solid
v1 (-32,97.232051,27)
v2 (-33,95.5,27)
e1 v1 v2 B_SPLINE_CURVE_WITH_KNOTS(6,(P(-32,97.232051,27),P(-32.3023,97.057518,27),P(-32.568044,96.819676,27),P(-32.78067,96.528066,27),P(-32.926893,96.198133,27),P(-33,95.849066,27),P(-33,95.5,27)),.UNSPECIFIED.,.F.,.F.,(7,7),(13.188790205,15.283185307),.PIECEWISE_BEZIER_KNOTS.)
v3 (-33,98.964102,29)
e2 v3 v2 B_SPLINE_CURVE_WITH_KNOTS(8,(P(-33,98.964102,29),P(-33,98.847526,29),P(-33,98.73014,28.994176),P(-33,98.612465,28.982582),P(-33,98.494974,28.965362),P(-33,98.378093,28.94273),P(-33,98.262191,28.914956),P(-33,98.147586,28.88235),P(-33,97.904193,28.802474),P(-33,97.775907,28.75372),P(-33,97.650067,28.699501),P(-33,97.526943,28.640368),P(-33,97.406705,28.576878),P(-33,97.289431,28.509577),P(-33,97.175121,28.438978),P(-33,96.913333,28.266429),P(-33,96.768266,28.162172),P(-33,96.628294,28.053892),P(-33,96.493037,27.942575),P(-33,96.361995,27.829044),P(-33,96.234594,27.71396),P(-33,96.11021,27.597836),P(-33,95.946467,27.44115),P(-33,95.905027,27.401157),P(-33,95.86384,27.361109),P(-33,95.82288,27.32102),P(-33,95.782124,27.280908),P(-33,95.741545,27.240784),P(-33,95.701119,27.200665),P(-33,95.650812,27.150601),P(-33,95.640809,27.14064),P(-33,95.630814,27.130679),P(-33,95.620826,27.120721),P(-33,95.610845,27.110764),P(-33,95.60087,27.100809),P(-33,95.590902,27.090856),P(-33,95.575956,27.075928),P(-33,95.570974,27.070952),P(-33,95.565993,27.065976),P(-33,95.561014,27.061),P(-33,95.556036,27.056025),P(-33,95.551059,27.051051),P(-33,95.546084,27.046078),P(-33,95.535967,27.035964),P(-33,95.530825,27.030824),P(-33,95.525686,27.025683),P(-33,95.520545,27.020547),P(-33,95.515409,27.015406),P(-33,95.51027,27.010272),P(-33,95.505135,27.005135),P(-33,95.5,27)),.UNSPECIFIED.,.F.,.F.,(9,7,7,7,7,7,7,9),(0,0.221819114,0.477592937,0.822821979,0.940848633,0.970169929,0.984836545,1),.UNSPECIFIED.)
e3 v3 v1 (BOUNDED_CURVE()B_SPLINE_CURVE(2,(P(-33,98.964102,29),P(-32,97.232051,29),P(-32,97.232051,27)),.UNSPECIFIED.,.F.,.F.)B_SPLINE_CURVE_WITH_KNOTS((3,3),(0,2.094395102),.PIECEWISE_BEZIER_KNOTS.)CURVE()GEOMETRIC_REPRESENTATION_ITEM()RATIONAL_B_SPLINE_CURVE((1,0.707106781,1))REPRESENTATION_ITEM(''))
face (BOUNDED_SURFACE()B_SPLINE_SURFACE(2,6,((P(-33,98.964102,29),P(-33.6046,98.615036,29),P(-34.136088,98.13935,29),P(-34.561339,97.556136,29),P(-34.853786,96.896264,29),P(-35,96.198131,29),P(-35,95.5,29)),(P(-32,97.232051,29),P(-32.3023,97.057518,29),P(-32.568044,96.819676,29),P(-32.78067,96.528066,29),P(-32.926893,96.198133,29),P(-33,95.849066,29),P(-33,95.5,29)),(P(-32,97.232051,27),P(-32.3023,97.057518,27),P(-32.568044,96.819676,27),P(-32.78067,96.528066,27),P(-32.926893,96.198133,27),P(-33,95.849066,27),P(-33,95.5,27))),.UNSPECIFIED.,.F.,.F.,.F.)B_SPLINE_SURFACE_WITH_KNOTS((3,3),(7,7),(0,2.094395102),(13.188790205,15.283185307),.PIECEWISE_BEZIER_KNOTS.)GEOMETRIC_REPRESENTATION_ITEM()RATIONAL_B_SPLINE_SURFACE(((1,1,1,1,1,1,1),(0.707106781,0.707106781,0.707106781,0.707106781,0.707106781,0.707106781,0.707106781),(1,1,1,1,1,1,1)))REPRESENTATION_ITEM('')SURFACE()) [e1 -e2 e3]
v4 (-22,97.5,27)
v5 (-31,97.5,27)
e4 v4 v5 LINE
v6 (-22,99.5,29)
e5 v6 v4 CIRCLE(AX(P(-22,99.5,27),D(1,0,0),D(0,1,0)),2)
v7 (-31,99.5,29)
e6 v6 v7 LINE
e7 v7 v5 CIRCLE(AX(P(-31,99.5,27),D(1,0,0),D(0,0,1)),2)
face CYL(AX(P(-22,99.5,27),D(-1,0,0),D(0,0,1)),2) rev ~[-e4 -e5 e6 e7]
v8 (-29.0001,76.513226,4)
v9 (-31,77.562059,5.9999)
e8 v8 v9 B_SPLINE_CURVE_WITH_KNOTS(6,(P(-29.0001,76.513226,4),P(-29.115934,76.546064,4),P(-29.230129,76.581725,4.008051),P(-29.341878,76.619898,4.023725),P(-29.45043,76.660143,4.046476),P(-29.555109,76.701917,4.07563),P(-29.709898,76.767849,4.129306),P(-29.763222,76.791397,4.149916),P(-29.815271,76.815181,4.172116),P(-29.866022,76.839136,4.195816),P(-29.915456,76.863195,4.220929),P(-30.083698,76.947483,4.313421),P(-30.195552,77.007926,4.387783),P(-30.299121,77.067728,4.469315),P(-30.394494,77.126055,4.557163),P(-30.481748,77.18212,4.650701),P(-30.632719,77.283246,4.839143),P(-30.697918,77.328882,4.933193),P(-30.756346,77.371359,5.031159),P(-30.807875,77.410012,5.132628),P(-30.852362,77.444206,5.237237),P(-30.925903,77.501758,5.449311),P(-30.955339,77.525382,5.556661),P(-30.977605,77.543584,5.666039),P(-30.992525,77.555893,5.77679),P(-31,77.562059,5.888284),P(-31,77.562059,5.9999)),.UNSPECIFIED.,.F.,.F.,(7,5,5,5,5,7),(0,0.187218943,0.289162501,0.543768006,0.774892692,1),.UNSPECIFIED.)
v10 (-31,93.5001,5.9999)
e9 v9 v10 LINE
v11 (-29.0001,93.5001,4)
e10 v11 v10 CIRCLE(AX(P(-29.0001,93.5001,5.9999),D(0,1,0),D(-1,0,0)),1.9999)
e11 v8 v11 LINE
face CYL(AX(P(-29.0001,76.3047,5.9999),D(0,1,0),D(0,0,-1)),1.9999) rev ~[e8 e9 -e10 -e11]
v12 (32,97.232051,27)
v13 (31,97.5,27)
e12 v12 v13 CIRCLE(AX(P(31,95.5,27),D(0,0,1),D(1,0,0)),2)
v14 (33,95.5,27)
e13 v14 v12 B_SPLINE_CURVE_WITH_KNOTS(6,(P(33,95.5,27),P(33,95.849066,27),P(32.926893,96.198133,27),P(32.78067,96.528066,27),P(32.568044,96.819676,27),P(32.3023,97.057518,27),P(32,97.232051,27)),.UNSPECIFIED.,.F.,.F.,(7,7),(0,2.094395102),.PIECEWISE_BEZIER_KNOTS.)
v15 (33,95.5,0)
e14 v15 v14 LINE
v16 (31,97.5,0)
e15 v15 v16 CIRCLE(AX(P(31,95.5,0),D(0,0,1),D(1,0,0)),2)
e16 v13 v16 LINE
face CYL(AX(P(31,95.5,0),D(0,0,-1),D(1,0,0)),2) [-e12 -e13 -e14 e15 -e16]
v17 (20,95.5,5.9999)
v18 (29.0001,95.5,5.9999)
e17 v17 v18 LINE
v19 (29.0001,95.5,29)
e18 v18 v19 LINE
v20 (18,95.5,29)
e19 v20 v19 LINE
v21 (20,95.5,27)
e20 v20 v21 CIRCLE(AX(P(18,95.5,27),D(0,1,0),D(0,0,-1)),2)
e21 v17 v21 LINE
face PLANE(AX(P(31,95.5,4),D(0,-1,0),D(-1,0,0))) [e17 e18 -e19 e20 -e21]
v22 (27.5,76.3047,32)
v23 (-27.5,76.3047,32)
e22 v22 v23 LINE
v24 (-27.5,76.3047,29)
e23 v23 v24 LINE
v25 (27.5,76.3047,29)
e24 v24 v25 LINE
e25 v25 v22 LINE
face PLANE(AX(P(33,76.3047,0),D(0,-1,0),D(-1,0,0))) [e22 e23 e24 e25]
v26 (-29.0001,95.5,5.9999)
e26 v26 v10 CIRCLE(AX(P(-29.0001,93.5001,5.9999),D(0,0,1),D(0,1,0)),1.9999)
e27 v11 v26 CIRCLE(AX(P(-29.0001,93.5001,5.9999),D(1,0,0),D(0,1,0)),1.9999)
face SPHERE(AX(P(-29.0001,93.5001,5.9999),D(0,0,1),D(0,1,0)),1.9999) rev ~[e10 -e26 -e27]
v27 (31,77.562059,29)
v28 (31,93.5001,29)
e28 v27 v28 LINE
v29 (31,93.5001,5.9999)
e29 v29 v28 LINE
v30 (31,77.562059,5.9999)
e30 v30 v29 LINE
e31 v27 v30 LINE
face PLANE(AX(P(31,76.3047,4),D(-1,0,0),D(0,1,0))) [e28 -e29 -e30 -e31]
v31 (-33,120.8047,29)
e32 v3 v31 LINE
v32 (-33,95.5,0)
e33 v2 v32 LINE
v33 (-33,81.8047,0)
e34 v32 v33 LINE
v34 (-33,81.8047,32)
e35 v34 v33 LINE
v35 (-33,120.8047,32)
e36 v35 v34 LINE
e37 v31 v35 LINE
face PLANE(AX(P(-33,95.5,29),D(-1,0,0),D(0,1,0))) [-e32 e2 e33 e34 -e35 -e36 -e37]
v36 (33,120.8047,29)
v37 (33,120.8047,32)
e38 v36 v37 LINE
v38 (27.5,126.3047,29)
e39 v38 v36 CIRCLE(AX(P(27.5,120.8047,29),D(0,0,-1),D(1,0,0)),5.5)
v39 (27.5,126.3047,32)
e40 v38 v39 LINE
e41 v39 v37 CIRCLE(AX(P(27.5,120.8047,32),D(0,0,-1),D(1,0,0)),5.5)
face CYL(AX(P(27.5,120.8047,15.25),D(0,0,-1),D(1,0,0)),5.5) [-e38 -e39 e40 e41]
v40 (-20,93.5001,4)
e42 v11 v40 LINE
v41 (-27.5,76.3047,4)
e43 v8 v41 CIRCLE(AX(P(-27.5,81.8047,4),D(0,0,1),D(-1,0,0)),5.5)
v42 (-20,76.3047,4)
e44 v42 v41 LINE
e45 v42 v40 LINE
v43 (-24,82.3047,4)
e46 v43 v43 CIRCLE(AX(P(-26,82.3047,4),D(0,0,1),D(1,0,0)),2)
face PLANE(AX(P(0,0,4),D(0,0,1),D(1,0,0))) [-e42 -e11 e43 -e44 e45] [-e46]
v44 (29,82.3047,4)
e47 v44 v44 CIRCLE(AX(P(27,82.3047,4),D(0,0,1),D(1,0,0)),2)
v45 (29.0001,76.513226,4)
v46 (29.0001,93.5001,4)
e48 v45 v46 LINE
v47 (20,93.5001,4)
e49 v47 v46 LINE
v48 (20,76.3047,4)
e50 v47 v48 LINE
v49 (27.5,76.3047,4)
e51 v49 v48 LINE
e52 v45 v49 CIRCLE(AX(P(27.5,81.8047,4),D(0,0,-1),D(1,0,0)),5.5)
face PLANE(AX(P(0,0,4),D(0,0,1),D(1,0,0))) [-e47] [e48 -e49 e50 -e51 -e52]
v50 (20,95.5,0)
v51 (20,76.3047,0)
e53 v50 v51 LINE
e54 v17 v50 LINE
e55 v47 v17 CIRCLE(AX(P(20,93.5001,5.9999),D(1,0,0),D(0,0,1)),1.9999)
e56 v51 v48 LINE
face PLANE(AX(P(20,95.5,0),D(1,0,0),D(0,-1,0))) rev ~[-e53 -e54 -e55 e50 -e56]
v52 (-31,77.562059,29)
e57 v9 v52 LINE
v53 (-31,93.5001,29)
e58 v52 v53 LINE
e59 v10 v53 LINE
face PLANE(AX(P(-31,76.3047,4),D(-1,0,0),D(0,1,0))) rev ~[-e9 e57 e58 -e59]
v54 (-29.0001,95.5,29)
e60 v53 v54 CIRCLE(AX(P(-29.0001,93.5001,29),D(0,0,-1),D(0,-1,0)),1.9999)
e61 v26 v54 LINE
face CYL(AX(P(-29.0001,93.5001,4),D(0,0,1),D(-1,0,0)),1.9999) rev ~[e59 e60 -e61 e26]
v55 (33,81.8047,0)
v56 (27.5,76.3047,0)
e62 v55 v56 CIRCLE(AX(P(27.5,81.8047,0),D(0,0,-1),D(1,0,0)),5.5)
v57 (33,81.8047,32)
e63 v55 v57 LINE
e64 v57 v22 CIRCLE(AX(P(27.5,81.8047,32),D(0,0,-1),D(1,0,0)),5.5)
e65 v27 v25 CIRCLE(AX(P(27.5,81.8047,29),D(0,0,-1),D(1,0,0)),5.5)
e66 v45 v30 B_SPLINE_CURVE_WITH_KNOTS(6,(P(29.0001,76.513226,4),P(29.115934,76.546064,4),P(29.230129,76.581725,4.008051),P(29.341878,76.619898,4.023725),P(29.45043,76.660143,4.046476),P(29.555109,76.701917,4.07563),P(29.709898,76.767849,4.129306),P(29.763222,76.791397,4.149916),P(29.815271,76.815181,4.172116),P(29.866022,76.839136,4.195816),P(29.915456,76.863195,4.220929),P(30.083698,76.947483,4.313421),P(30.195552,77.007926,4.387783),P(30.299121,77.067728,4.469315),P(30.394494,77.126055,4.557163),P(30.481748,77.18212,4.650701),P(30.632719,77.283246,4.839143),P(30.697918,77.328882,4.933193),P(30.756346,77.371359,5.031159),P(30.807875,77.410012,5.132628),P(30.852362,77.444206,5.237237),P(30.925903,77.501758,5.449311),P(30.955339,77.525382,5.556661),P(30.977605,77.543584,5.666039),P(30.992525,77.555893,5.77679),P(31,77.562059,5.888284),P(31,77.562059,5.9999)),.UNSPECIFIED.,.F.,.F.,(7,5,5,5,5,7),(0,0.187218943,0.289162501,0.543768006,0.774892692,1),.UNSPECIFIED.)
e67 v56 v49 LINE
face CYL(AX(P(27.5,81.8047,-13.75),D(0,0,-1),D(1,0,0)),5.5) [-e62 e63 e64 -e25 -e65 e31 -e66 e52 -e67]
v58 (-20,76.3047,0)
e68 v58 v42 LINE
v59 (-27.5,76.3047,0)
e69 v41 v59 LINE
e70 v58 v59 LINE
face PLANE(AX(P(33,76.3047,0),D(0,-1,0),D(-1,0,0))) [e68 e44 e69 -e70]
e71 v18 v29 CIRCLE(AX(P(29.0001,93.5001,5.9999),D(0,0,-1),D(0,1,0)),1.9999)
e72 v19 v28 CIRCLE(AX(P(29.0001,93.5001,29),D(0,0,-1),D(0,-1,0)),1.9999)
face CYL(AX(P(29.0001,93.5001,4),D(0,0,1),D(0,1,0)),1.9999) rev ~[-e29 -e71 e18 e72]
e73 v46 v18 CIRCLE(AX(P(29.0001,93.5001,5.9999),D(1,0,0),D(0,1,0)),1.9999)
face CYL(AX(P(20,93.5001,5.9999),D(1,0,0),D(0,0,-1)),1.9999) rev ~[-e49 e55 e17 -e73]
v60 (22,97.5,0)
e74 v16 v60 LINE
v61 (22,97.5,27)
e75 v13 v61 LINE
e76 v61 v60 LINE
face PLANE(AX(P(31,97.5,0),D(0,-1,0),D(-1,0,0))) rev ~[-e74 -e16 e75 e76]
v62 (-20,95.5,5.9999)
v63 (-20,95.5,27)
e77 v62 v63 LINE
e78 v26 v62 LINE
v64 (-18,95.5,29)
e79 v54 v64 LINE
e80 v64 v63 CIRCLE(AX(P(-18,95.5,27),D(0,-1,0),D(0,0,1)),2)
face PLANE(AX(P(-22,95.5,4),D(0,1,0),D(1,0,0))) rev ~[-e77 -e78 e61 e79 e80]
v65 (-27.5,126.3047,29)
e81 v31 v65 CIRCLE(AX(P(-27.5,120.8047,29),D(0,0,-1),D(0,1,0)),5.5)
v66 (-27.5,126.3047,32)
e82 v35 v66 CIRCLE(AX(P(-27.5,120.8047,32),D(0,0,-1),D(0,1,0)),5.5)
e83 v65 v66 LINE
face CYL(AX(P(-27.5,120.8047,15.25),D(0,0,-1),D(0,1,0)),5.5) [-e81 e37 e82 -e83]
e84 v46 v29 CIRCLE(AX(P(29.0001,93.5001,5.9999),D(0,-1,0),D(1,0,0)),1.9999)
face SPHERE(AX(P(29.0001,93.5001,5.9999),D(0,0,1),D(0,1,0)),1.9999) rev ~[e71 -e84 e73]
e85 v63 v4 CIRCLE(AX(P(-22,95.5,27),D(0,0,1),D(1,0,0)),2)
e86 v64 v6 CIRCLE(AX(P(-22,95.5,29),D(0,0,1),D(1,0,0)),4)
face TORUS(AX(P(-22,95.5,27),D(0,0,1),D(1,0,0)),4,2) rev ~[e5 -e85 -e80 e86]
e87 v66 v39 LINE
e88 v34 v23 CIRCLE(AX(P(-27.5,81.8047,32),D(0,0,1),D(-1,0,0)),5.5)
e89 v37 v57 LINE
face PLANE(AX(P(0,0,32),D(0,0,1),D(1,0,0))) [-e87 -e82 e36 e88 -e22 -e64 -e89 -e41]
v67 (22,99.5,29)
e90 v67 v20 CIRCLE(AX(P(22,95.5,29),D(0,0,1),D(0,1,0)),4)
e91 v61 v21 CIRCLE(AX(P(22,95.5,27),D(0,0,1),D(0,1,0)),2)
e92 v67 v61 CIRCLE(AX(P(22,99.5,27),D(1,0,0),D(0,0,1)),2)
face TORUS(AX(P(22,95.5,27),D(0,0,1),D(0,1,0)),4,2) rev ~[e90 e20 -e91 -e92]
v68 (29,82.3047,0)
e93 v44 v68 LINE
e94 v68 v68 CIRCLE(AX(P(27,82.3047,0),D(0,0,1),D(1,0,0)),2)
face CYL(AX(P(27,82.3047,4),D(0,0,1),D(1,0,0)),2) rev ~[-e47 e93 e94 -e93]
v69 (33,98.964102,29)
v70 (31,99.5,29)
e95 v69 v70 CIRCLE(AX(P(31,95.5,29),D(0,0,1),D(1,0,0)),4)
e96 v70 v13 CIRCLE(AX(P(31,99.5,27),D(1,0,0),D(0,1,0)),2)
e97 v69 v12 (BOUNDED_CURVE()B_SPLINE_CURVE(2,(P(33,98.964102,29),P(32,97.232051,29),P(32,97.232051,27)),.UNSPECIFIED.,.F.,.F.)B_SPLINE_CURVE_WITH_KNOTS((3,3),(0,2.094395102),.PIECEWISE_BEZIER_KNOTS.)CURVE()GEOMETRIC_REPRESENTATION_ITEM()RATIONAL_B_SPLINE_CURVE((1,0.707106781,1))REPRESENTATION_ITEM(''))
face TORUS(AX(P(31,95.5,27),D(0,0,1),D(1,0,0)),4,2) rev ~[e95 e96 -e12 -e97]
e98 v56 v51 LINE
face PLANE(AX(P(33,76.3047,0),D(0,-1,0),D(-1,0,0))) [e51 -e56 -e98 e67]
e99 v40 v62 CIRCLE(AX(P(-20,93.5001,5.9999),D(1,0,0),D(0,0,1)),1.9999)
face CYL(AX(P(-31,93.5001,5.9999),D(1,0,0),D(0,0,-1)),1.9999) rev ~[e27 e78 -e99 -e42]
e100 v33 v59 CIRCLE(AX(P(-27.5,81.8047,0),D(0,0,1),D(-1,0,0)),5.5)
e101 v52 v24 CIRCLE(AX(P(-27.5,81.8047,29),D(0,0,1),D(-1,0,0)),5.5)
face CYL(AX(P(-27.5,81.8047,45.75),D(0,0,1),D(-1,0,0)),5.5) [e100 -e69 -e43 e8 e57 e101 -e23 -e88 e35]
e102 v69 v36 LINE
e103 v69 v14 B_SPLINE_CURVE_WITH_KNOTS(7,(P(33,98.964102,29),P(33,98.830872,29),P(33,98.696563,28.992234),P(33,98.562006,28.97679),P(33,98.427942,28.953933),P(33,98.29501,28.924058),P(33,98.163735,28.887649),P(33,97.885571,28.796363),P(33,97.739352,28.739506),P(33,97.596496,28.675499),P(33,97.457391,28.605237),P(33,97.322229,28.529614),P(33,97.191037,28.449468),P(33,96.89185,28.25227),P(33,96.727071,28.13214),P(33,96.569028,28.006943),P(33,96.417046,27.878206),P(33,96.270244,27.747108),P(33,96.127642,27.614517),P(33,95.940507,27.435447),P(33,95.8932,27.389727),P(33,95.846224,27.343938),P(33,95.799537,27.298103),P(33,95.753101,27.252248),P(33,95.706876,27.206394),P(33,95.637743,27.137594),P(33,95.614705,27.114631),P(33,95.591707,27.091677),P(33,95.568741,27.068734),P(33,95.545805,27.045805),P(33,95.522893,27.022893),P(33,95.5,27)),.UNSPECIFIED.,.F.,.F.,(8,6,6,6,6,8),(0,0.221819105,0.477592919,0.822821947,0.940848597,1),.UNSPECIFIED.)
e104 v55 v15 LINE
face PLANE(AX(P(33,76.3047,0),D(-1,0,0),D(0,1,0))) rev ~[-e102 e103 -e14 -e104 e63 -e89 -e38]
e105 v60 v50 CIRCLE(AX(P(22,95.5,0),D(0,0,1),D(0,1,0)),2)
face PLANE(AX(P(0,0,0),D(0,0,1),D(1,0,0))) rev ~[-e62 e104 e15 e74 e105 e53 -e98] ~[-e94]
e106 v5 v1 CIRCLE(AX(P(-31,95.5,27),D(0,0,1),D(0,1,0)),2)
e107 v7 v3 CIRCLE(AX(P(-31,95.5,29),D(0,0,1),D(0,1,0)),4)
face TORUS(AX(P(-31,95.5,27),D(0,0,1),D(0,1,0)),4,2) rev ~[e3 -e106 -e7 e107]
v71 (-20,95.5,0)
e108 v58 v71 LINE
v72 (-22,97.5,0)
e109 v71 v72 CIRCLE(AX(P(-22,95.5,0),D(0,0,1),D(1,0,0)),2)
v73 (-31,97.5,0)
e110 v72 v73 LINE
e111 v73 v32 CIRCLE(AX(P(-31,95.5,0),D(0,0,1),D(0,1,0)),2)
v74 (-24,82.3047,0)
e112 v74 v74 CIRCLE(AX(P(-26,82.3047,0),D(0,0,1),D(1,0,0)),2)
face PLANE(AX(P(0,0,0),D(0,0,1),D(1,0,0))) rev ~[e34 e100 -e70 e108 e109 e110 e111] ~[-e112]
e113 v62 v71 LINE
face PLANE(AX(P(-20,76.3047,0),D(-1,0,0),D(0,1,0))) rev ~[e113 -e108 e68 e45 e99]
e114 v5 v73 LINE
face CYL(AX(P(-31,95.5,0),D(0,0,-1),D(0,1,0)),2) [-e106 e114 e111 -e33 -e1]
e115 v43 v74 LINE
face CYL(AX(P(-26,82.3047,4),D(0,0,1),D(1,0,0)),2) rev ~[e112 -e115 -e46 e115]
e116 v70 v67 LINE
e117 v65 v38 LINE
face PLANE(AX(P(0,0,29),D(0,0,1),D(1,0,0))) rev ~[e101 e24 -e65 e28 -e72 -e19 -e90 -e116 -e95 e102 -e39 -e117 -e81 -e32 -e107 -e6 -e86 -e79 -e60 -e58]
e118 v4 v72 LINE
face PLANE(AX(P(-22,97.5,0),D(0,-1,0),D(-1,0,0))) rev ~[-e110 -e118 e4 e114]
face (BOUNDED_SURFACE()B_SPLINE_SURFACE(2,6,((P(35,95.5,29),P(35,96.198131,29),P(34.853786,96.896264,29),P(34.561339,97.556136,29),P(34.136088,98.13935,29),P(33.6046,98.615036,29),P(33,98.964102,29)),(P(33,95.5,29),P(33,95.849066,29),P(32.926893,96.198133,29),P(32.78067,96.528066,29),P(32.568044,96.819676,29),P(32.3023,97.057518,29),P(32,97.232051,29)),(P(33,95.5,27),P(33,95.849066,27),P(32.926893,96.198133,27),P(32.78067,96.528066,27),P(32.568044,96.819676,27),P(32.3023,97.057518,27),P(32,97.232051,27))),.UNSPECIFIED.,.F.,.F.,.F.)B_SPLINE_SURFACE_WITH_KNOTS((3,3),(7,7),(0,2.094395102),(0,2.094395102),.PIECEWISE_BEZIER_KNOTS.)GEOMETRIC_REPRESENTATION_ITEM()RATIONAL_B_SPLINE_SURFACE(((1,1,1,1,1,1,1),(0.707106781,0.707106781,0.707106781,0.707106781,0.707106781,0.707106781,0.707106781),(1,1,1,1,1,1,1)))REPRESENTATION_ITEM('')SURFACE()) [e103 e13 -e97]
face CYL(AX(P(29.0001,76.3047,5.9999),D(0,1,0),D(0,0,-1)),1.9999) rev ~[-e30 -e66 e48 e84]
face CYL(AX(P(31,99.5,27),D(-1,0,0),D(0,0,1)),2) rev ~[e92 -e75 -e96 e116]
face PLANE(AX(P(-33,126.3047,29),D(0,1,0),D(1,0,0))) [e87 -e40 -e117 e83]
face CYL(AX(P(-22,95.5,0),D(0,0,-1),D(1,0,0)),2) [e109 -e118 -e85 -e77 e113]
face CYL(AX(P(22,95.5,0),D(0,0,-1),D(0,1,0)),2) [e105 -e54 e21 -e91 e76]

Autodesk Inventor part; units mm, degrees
ref_plane "YZ Plane" through (0, 0, 0) normal (1, 0, 0) x (0, 1, 0)
ref_plane "XZ Plane" through (0, 0, 0) normal (0, 1, 0) x (-1, 0, 0)
ref_plane "XY Plane" through (0, 0, 0) normal (0, 0, 1) x (1, 0, 0)
ref_plane "Work Plane1" through (0, 0, 0) normal (0, 0, 1) x (1, 0, 0)
sketch "Sketch1" plane through (0, 0, 0) normal (0, 0, 1) x (1, 0, 0)
  line L0 (-34.9568, 37.8) -> (-33.8, 37.8) projected
  arc A0 (-52.5, 15.282) -> (-34.9568, 37.8) centre (-55.9339, 36.05) ccw projected
  line L1 (-52.5, 15.282) -> (-52.5, -15) projected
  line L2 (-47.7, -15) -> (-52.5, -15) projected
  arc A1 (-33, -29.7) -> (-47.7, -15) centre (-47.7, -29.7) ccw projected
  line L3 (-33, -29.7) -> (-33, -95.5) projected
  arc A2 (-33, -95.5) -> (-31, -97.5) centre (-31, -95.5) ccw projected
  line L4 (-31, -97.5) -> (-22, -97.5) projected
  arc A3 (-22, -97.5) -> (-20, -95.5) centre (-22, -95.5) ccw projected
  line L5 (-20, -74.5) -> (-20, -95.5) projected
  arc A4 (-18, -72.5) -> (-20, -74.5) centre (-18, -74.5) ccw projected
  line L6 (18, -72.5) -> (-18, -72.5) projected
  arc A5 (20, -74.5) -> (18, -72.5) centre (18, -74.5) ccw projected
  line L7 (20, -74.5) -> (20, -95.5) projected
  arc A6 (20, -95.5) -> (22, -97.5) centre (22, -95.5) ccw projected
  line L8 (31, -97.5) -> (22, -97.5) projected
  arc A7 (31, -97.5) -> (33, -95.5) centre (31, -95.5) ccw projected
  line L9 (33, -29.7) -> (33, -95.5) projected
  arc A8 (47.7, -15) -> (33, -29.7) centre (47.7, -29.7) ccw projected
  line L10 (52.5, -15) -> (47.7, -15) projected
  line L11 (52.5, -15) -> (52.5, 15) projected
  line L12 (52.5, 15) -> (47.7, 15) projected
  arc A9 (33, 29.7) -> (47.7, 15) centre (47.7, 29.7) ccw projected
  line L13 (33, 29.7) -> (33, 95.5) projected
  arc A10 (33, 95.5) -> (31, 97.5) centre (31, 95.5) ccw projected
  line L14 (31, 97.5) -> (22, 97.5) projected
  arc A11 (22, 97.5) -> (20, 95.5) centre (22, 95.5) ccw projected
  line L15 (20, 95.5) -> (20, 74.5) projected
  arc A12 (18, 72.5) -> (20, 74.5) centre (18, 74.5) ccw projected
  line L16 (18, 72.5) -> (-18, 72.5) projected
  arc A13 (-20, 74.5) -> (-18, 72.5) centre (-18, 74.5) ccw projected
  line L17 (-20, 74.5) -> (-20, 95.5) projected
  arc A14 (-20, 95.5) -> (-22, 97.5) centre (-22, 95.5) ccw projected
  line L18 (-22, 97.5) -> (-31, 97.5) projected
  arc A15 (-31, 97.5) -> (-33, 95.5) centre (-31, 95.5) ccw projected
  line L19 (-33, 95.5) -> (-33, 74.5) projected
  arc A16 (-33.8, 72.9) -> (-33, 74.5) centre (-35, 74.5) ccw projected
  line L20 (-33.8, 72.9) -> (-33.8, 37.8) projected
  circle A17 centre (-21.8, 62.5) radius 3 projected
  circle A18 centre (26.5, 62.5) radius 4 projected
  arc A19 (-2.5981, -57.75) -> (2.5981, -57.75) centre (0, -56.25) ccw projected
  line L21 (-2.5981, -57.75) -> (-13, -57.75) projected
  line L22 (-13, -57.75) -> (-13, -54.75) projected
  line L23 (-2.5981, -54.75) -> (-13, -54.75) projected
  arc A20 (2.5981, -54.75) -> (-2.5981, -54.75) centre (0, -56.25) ccw projected
  line L24 (13, -54.75) -> (2.5981, -54.75) projected
  line L25 (13, -57.75) -> (13, -54.75) projected
  line L26 (13, -57.75) -> (2.5981, -57.75) projected
  circle A21 centre (-10.5, -67.75) radius 1.5 projected
  circle A22 centre (10.5, -67.75) radius 1.5 projected
  line L27 (-19.3171, -45) -> (-23.6904, -45) projected
  line L28 (-23.6904, -45) -> (-23.6904, -25.95) projected
  line L29 (-23.6904, -25.95) -> (-19.382, -25.95) projected
  spline S0 degree 3 poles (-19.382, -25.95) (-19.0461, -25.9523) (-18.3968, -25.9567) (-17.4563, -26.0086) (-16.581, -26.0848) (-15.773, -26.2013) (-15.0294, -26.3366) (-14.3557, -26.5178) (-13.7463, -26.7258) (-13.195, -26.968) (-12.693, -27.2522) (-12.2198, -27.5714) (-11.7698, -27.9304) (-11.3405, -28.3302) (-10.931, -28.768) (-10.5507, -29.2527) (-10.1877, -29.7717) (-9.8476, -30.3268) (-9.5449, -30.9169) (-9.2755, -31.5328) (-9.051, -32.1747) (-8.8682, -32.8419) (-8.7226, -33.5324) (-8.6207, -34.2476) (-8.5577, -34.9867) (-8.5513, -35.4876) (-8.5481, -35.7421) knots 0 0 0 0 0.060145 0.116262 0.168646 0.217421 0.26241 0.303907 0.342233 0.377621 0.411584 0.445386 0.479752 0.514569 0.550351 0.586994 0.624785 0.663736 0.70347 0.743462 0.784023 0.82514 0.867271 0.910311 0.954426 1 1 1 1 projected
  spline S1 degree 3 poles (-8.5481, -35.7421) (-8.5566, -36.1013) (-8.5733, -36.8083) (-8.7143, -37.8459) (-8.9423, -38.8405) (-9.263, -39.7843) (-9.6601, -40.6693) (-10.1357, -41.4778) (-10.6762, -42.2113) (-11.2862, -42.8578) (-11.9457, -43.4169) (-12.6337, -43.8901) (-13.3497, -44.2699) (-13.9819, -44.5071) (-14.5316, -44.6562) (-15.0135, -44.7428) (-15.562, -44.8231) (-16.1791, -44.8922) (-16.8667, -44.9395) (-17.6225, -44.9721) (-18.4469, -44.9964) (-19.0195, -44.9988) (-19.3171, -45) knots 0 0 0 0 0.065767 0.129467 0.191414 0.252424 0.311761 0.368786 0.423917 0.478313 0.53121 0.582008 0.630995 0.679292 0.705349 0.735235 0.768913 0.806892 0.848943 0.895126 0.945474 1 1 1 1 projected
  line L30 (3.7964, 45) -> (7.4446, 45) projected
  line L31 (7.4446, 45) -> (-0.2525, 25.95) projected
  line L32 (-0.2525, 25.95) -> (-3.4237, 25.95) projected
  line L33 (-3.4237, 25.95) -> (-11.1169, 45) projected
  line L34 (-11.1169, 45) -> (-7.4649, 45) projected
  line L35 (-7.4649, 45) -> (-5.9843, 41.0923) projected
  line L36 (-5.9843, 41.0923) -> (2.3158, 41.0923) projected
  line L37 (2.3158, 41.0923) -> (3.7964, 45) projected
  spline S2 degree 3 poles (-13.4371, 30.2927) (-13.4413, 30.1296) (-13.4494, 29.8083) (-13.522, 29.3359) (-13.6305, 28.88) (-13.7882, 28.4424) (-13.9927, 28.0235) (-14.2412, 27.6214) (-14.5373, 27.2397) (-14.8711, 26.8787) (-15.2388, 26.5488) (-15.6318, 26.2577) (-16.0477, 26.0117) (-16.4842, 25.8077) (-16.9438, 25.6516) (-17.4232, 25.5409) (-17.923, 25.475) (-18.263, 25.4661) (-18.4362, 25.4615) knots 0 0 0 0 0.063173 0.124457 0.184841 0.244567 0.304319 0.3652 0.427421 0.491262 0.555499 0.618605 0.680495 0.742473 0.804991 0.868252 0.932887 1 1 1 1 projected
  spline S3 degree 3 poles (-18.4362, 25.4615) (-18.6607, 25.4697) (-19.1078, 25.4861) (-19.7689, 25.614) (-20.4146, 25.8152) (-20.935, 26.0578) (-21.349, 26.2929) (-21.6663, 26.5093) (-21.9892, 26.7572) (-22.3203, 27.0374) (-22.6533, 27.3552) (-22.9979, 27.703) (-23.3493, 28.0837) (-23.5776, 28.3557) (-23.6948, 28.4953) knots 0 0 0 0 0.10691 0.212977 0.319777 0.428556 0.485857 0.546559 0.611431 0.679821 0.753159 0.830753 0.913133 1 1 1 1 projected
  line L38 (-23.6948, 28.4953) -> (-21.138, 30.8346) projected
  spline S4 degree 3 poles (-21.138, 30.8346) (-21.0285, 30.6801) (-20.8182, 30.3835) (-20.4774, 29.9864) (-20.1381, 29.6476) (-19.7972, 29.3685) (-19.4517, 29.1509) (-19.1022, 28.9969) (-18.7506, 28.899) (-18.5144, 28.8868) (-18.3981, 28.8808) knots 0 0 0 0 0.16242 0.311824 0.448433 0.573381 0.689077 0.797573 0.900293 1 1 1 1 projected
  spline S5 degree 3 poles (-18.3981, 28.8808) (-18.2895, 28.8846) (-18.08, 28.8919) (-17.7813, 28.965) (-17.5161, 29.091) (-17.2847, 29.2559) (-17.1014, 29.4544) (-16.955, 29.6627) (-16.8726, 29.8926) (-16.8617, 30.0505) (-16.8564, 30.1286) knots 0 0 0 0 0.148126 0.285993 0.416634 0.54738 0.671583 0.784401 0.893266 1 1 1 1 projected
  spline S6 degree 3 poles (-16.8564, 30.1286) (-16.8597, 30.2079) (-16.8665, 30.3676) (-16.932, 30.6016) (-17.0306, 30.8303) (-17.1249, 30.9695) (-17.1731, 31.0407) knots 0 0 0 0 0.241881 0.487115 0.737838 1 1 1 1 projected
  spline S7 degree 3 poles (-17.1731, 31.0407) (-17.2169, 31.096) (-17.3177, 31.2233) (-17.51, 31.425) (-17.7515, 31.672) (-18.0515, 31.9559) (-18.3975, 32.2869) (-18.8055, 32.6521) (-19.2639, 33.0626) (-19.5897, 33.3485) (-19.7604, 33.4983) knots 0 0 0 0 0.059234 0.136349 0.233805 0.349411 0.483179 0.635967 0.809243 1 1 1 1 projected
  spline S8 degree 3 poles (-19.7604, 33.4983) (-19.9207, 33.6369) (-20.2248, 33.9001) (-20.6575, 34.2737) (-21.0377, 34.6098) (-21.3711, 34.9034) (-21.6525, 35.1575) (-21.8832, 35.3734) (-22.066, 35.5468) (-22.1698, 35.6516) (-22.2142, 35.6963) knots 0 0 0 0 0.192953 0.366184 0.520457 0.655012 0.770624 0.865677 0.942675 1 1 1 1 projected
  spline S9 degree 3 poles (-22.2142, 35.6963) (-22.3823, 35.8783) (-22.7056, 36.2282) (-23.1258, 36.7704) (-23.4717, 37.2997) (-23.7392, 37.8261) (-23.9412, 38.3571) (-24.0837, 38.9058) (-24.169, 39.4779) (-24.1785, 39.8683) (-24.1833, 40.0658) knots 0 0 0 0 0.150833 0.289954 0.417139 0.535255 0.648751 0.762405 0.879827 1 1 1 1 projected
  spline S10 degree 3 poles (-24.1833, 40.0658) (-24.1799, 40.2582) (-24.1732, 40.6357) (-24.0912, 41.1881) (-23.9744, 41.7167) (-23.7937, 42.2159) (-23.5735, 42.6938) (-23.2975, 43.143) (-22.9733, 43.568) (-22.6017, 43.9612) (-22.1907, 44.318) (-21.7499, 44.6356) (-21.2749, 44.8978) (-20.7698, 45.1138) (-20.2349, 45.2801) (-19.6709, 45.403) (-19.0767, 45.4768) (-18.6705, 45.4845) (-18.4629, 45.4885) knots 0 0 0 0 0.065201 0.127927 0.189047 0.248544 0.307607 0.367248 0.426963 0.488617 0.550392 0.611331 0.672556 0.734024 0.797341 0.86225 0.929625 1 1 1 1 projected
  spline S11 degree 3 poles (-18.4629, 45.4885) (-18.3, 45.4856) (-17.9773, 45.4798) (-17.5017, 45.4331) (-17.0425, 45.3577) (-16.6001, 45.2496) (-16.1726, 45.1126) (-15.76, 44.9452) (-15.3651, 44.745) (-14.9849, 44.5159) (-14.6212, 44.2499) (-14.2696, 43.9524) (-13.9334, 43.6189) (-13.611, 43.2501) (-13.3046, 42.8451) (-13.004, 42.4093) (-12.7227, 41.9348) (-12.549, 41.602) (-12.4602, 41.4319) knots 0 0 0 0 0.063551 0.125868 0.18624 0.244977 0.303358 0.36123 0.418489 0.475937 0.534204 0.594059 0.655469 0.718772 0.784975 0.853522 0.925182 1 1 1 1 projected
  line L39 (-12.4602, 41.4319) -> (-15.4673, 39.6269) projected
  spline S12 degree 3 poles (-15.4673, 39.6269) (-15.5783, 39.8199) (-15.7912, 40.1899) (-16.1519, 40.687) (-16.5214, 41.1127) (-16.9082, 41.4595) (-17.3078, 41.7319) (-17.7219, 41.9266) (-18.1509, 42.0472) (-18.4431, 42.0619) (-18.5889, 42.0692) knots 0 0 0 0 0.160458 0.307612 0.442139 0.566229 0.681222 0.789558 0.895029 1 1 1 1 projected
  spline S13 degree 3 poles (-18.5889, 42.0692) (-18.7371, 42.0632) (-19.0248, 42.0516) (-19.4353, 41.9442) (-19.8118, 41.7754) (-20.1371, 41.5347) (-20.4127, 41.2569) (-20.616, 40.9478) (-20.7437, 40.6134) (-20.7572, 40.3811) (-20.764, 40.2642) knots 0 0 0 0 0.141986 0.275473 0.404346 0.53543 0.661427 0.777867 0.88828 1 1 1 1 projected
  spline S14 degree 3 poles (-20.764, 40.2642) (-20.7578, 40.1555) (-20.745, 39.9347) (-20.6512, 39.6064) (-20.5044, 39.2782) (-20.3309, 39.009) (-20.1542, 38.7836) (-19.9853, 38.5884) (-19.7796, 38.3726) (-19.5377, 38.1361) (-19.2627, 37.8768) (-18.9544, 37.5947) (-18.6093, 37.2923) (-18.3653, 37.0863) (-18.2378, 36.9785) knots 0 0 0 0 0.076347 0.155091 0.238352 0.328404 0.379384 0.439618 0.509831 0.588875 0.677436 0.775547 0.882636 1 1 1 1 projected
  spline S15 degree 3 poles (-18.2378, 36.9785) (-17.9953, 36.7734) (-17.5299, 36.3796) (-16.8723, 35.7981) (-16.2797, 35.2545) (-15.7573, 34.7423) (-15.2983, 34.2709) (-14.906, 33.8364) (-14.5847, 33.4355) (-14.2465, 32.9607) (-13.9251, 32.3821) (-13.6474, 31.686) (-13.4672, 30.99) (-13.4471, 30.5227) (-13.4371, 30.2927) knots 0 0 0 0 0.112125 0.215201 0.309902 0.395959 0.473447 0.54214 0.602523 0.654726 0.747804 0.835278 0.918925 1 1 1 1 projected
  spline S16 degree 3 poles (13.9212, -30.2927) (13.9253, -30.1296) (13.9334, -29.8083) (14.006, -29.3358) (14.1149, -28.8801) (14.2713, -28.4413) (14.4812, -28.0244) (14.7291, -27.6225) (15.0221, -27.237) (15.3579, -26.8764) (15.7266, -26.5449) (16.1197, -26.2541) (16.5338, -26.0081) (16.9701, -25.8078) (17.4277, -25.6514) (17.9072, -25.5409) (18.4071, -25.475) (18.7471, -25.4661) (18.9203, -25.4615) knots 0 0 0 0 0.063175 0.124462 0.184848 0.244577 0.304549 0.365432 0.427356 0.491896 0.556136 0.619244 0.681136 0.742463 0.804983 0.868247 0.932885 1 1 1 1 projected
  spline S17 degree 3 poles (18.9203, -25.4615) (19.1447, -25.4698) (19.5918, -25.4862) (20.2531, -25.6138) (20.8993, -25.8165) (21.4216, -26.0553) (21.8337, -26.2941) (22.1502, -26.5094) (22.4748, -26.7567) (22.8016, -27.0431) (23.1428, -27.3521) (23.4813, -27.7049) (23.8337, -28.0834) (24.0618, -28.3556) (24.1788, -28.4953) knots 0 0 0 0 0.106908 0.212971 0.319769 0.429097 0.485871 0.546571 0.611442 0.680224 0.75359 0.830757 0.913135 1 1 1 1 projected
  line L40 (24.1788, -28.4953) -> (21.6221, -30.8346) projected
  spline S18 degree 3 poles (21.6221, -30.8346) (21.5126, -30.6801) (21.3023, -30.3834) (20.9612, -29.9866) (20.6222, -29.6459) (20.2782, -29.371) (19.9353, -29.1497) (19.5861, -28.9971) (19.2347, -28.8989) (18.9984, -28.8868) (18.8821, -28.8808) knots 0 0 0 0 0.162432 0.311848 0.448466 0.574275 0.689054 0.797558 0.900286 1 1 1 1 projected
  spline S19 degree 3 poles (18.8821, -28.8808) (18.7735, -28.8845) (18.5639, -28.8916) (18.2664, -28.966) (17.9991, -29.0863) (17.769, -29.2525) (17.584, -29.4509) (17.4401, -29.6621) (17.3564, -29.8925) (17.3457, -30.0504) (17.3404, -30.1286) knots 0 0 0 0 0.14802 0.285787 0.415605 0.546256 0.67037 0.784556 0.893342 1 1 1 1 projected
  spline S20 degree 3 poles (17.3404, -30.1286) (17.3437, -30.2079) (17.3505, -30.3676) (17.416, -30.6016) (17.5147, -30.8303) (17.6089, -30.9695) (17.6571, -31.0407) knots 0 0 0 0 0.241881 0.487115 0.737838 1 1 1 1 projected
  spline S21 degree 3 poles (17.6571, -31.0407) (17.7011, -31.0958) (17.8029, -31.2235) (17.9912, -31.4289) (18.2374, -31.6701) (18.5311, -31.9592) (18.8833, -32.2849) (19.2865, -32.6567) (19.7496, -33.0619) (20.0741, -33.348) (20.2444, -33.4983) knots 0 0 0 0 0.059231 0.13713 0.233823 0.348656 0.483195 0.636695 0.809253 1 1 1 1 projected
  spline S22 degree 3 poles (20.2444, -33.4983) (20.4047, -33.6369) (20.7089, -33.9) (21.1411, -34.2741) (21.5235, -34.6091) (21.8525, -34.9076) (22.1379, -35.1573) (22.3671, -35.3735) (22.55, -35.5468) (22.6539, -35.6516) (22.6982, -35.6963) knots 0 0 0 0 0.192953 0.366186 0.520459 0.655785 0.770623 0.865677 0.942674 1 1 1 1 projected
  spline S23 degree 3 poles (22.6982, -35.6963) (22.8665, -35.8783) (23.1899, -36.2281) (23.6095, -36.7716) (23.9585, -37.298) (24.2288, -37.8224) (24.4248, -38.3553) (24.5675, -38.9046) (24.6531, -39.4779) (24.6625, -39.8683) (24.6673, -40.0658) knots 0 0 0 0 0.150802 0.289894 0.417473 0.534875 0.648075 0.762455 0.879852 1 1 1 1 projected
  spline S24 degree 3 poles (24.6673, -40.0658) (24.6639, -40.2582) (24.6572, -40.6357) (24.5753, -41.1881) (24.4583, -41.7167) (24.2781, -42.2161) (24.0566, -42.6924) (23.7866, -43.1456) (23.4565, -43.5652) (23.0899, -43.9625) (22.678, -44.3191) (22.2351, -44.6335) (21.7603, -44.899) (21.2573, -45.1177) (20.7198, -45.2801) (20.1561, -45.4028) (19.5608, -45.4768) (19.1545, -45.4845) (18.947, -45.4885) knots 0 0 0 0 0.06519 0.127905 0.189015 0.248502 0.307556 0.366963 0.426931 0.48828 0.550044 0.611324 0.672163 0.734187 0.796953 0.862273 0.929637 1 1 1 1 projected
  spline S25 degree 3 poles (18.947, -45.4885) (18.784, -45.4856) (18.4613, -45.4799) (17.9858, -45.4331) (17.5265, -45.3578) (17.0843, -45.2491) (16.6566, -45.1145) (16.2479, -44.9395) (15.8528, -44.7415) (15.4726, -44.5122) (15.1104, -44.2458) (14.7559, -43.9529) (14.4216, -43.6174) (14.0947, -43.2516) (13.7889, -42.8448) (13.488, -42.4094) (13.2068, -41.9348) (13.033, -41.602) (12.9442, -41.4319) knots 0 0 0 0 0.063568 0.125901 0.186289 0.24504 0.303437 0.361056 0.418329 0.475792 0.534074 0.593626 0.655051 0.718698 0.784919 0.853484 0.925163 1 1 1 1 projected
  line L41 (12.9442, -41.4319) -> (15.9513, -39.6269) projected
  spline S26 degree 3 poles (15.9513, -39.6269) (16.0623, -39.8199) (16.2752, -40.1899) (16.6359, -40.687) (17.0054, -41.1127) (17.3923, -41.4595) (17.7918, -41.7319) (18.2059, -41.9266) (18.6349, -42.0472) (18.9271, -42.0619) (19.0729, -42.0692) knots 0 0 0 0 0.160458 0.307612 0.442139 0.566229 0.681222 0.789558 0.895029 1 1 1 1 projected
  spline S27 degree 3 poles (19.0729, -42.0692) (19.2212, -42.0633) (19.5089, -42.0518) (19.9202, -41.9432) (20.299, -41.7767) (20.6246, -41.5344) (20.9012, -41.2581) (21.0994, -40.9466) (21.228, -40.6135) (21.2414, -40.3811) (21.2481, -40.2642) knots 0 0 0 0 0.141922 0.275349 0.405274 0.536299 0.66224 0.777967 0.88833 1 1 1 1 projected
  spline S28 degree 3 poles (21.2481, -40.2642) (21.2418, -40.1555) (21.229, -39.9347) (21.1354, -39.6062) (20.9879, -39.2793) (20.8186, -39.0084) (20.642, -38.7825) (20.469, -38.5898) (20.2639, -38.3723) (20.0216, -38.1362) (19.7467, -37.8768) (19.4384, -37.5947) (19.0933, -37.2923) (18.8494, -37.0863) (18.7218, -36.9785) knots 0 0 0 0 0.076338 0.155074 0.238325 0.327891 0.378865 0.43968 0.509886 0.588921 0.677472 0.775572 0.882649 1 1 1 1 projected
  spline S29 degree 3 poles (18.7218, -36.9785) (18.4793, -36.7734) (18.014, -36.3796) (17.3562, -35.7981) (16.764, -35.2543) (16.2411, -34.7437) (15.7861, -34.2697) (15.394, -33.8364) (15.0711, -33.4353) (14.7362, -32.9562) (14.4091, -32.3806) (14.131, -31.6849) (13.9513, -30.99) (13.9311, -30.5227) (13.9212, -30.2927) knots 0 0 0 0 0.11214 0.215231 0.309946 0.396015 0.473203 0.541905 0.602297 0.654875 0.748186 0.835255 0.918914 1 1 1 1 projected
  line L42 (-3.3124, -45) -> (-6.9606, -45) projected
  line L43 (-6.9606, -45) -> (0.7365, -25.95) projected
  line L44 (0.7365, -25.95) -> (3.9077, -25.95) projected
  line L45 (3.9077, -25.95) -> (11.601, -45) projected
  line L46 (11.601, -45) -> (7.9489, -45) projected
  line L47 (7.9489, -45) -> (6.4683, -41.0923) projected
  line L48 (6.4683, -41.0923) -> (-1.8317, -41.0923) projected
  line L49 (-1.8317, -41.0923) -> (-3.3124, -45) projected
  line L50 (19.8012, 45) -> (24.1744, 45) projected
  line L51 (24.1744, 45) -> (24.1744, 25.95) projected
  line L52 (24.1744, 25.95) -> (19.866, 25.95) projected
  spline S30 degree 3 poles (19.866, 25.95) (19.5301, 25.9523) (18.8809, 25.9569) (17.9402, 26.008) (17.0655, 26.0867) (16.2562, 26.1949) (15.514, 26.338) (14.8397, 26.5176) (14.2313, 26.7249) (13.6819, 26.9689) (13.1804, 27.2533) (12.7041, 27.57) (12.2542, 27.9308) (11.8241, 28.3287) (11.4196, 28.7709) (11.0337, 29.25) (10.6761, 29.7731) (10.3359, 30.3276) (10.0282, 30.9159) (9.7598, 31.5329) (9.5349, 32.1747) (9.3523, 32.8419) (9.2066, 33.5324) (9.1047, 34.2476) (9.0417, 34.9867) (9.0354, 35.4876) (9.0321, 35.7421) knots 0 0 0 0 0.060148 0.116267 0.168654 0.217399 0.262434 0.303933 0.34226 0.377441 0.411406 0.445398 0.479766 0.514584 0.550214 0.587001 0.624663 0.663615 0.703456 0.74345 0.784013 0.825133 0.867265 0.910306 0.954424 1 1 1 1 projected
  spline S31 degree 3 poles (9.0321, 35.7421) (9.0406, 36.1013) (9.0573, 36.8083) (9.1983, 37.8459) (9.4263, 38.8405) (9.7469, 39.7844) (10.1444, 40.6691) (10.6192, 41.4791) (11.1644, 42.21) (11.7737, 42.8582) (12.4333, 43.4153) (13.1189, 43.8925) (13.8369, 44.2687) (14.4696, 44.5073) (15.0183, 44.6557) (15.5, 44.7434) (16.0471, 44.8238) (16.6649, 44.886) (17.3504, 44.9414) (18.1066, 44.9715) (18.9309, 44.9965) (19.5035, 44.9988) (19.8012, 45) knots 0 0 0 0 0.065773 0.129478 0.19143 0.252446 0.311787 0.368818 0.424092 0.478492 0.531394 0.582004 0.631201 0.679503 0.705561 0.735222 0.769132 0.806858 0.84893 0.895117 0.94547 1 1 1 1 projected
  line L53 (33, 76.3047) -> (-33, 76.3047)
  line L54 (20, 76.3047) -> (33, 76.3047)
  line L55 (-33, 76.3047) -> (-20, 76.3047)
  point P0 (0, 0)
extrude "Extrusion1" add sketch "Sketch1" along normal blind 4 contours L19 A15 L18 A14 L17 L53 | L15 A11 L14 A10 L13 L53
sketch "Sketch2" plane through (0, 0, 4) normal (0, 0, 1) x (1, 0, 0)
  arc A0 (33, 95.5) -> (31, 97.5) centre (31, 95.5) ccw projected
  line L0 (31, 97.5) -> (22, 97.5) projected
  arc A1 (22, 97.5) -> (20, 95.5) centre (22, 95.5) ccw projected
  line L1 (20, 95.5) -> (20, 76.3047) projected
  line L2 (20, 76.3047) -> (33, 76.3047) projected
  line L3 (33, 76.3047) -> (33, 95.5) projected
  arc A2 (-20, 95.5) -> (-22, 97.5) centre (-22, 95.5) ccw projected
  line L4 (-22, 97.5) -> (-31, 97.5) projected
  arc A3 (-31, 97.5) -> (-33, 95.5) centre (-31, 95.5) ccw projected
  line L5 (-33, 95.5) -> (-33, 76.3047) projected
  line L6 (-33, 76.3047) -> (-20, 76.3047) projected
  line L7 (-20, 76.3047) -> (-20, 95.5) projected
  circle A4 centre (27, 82.3047) radius 2
  circle A5 centre (-26, 82.3047) radius 2
  point P0 (0, 0)
  dimension "d2" = 6
  dimension "d3" = 6
  dimension "d4" = 6
  dimension "d5" = 6
  dimension "d6" = 4
  dimension "d7" = 4
extrude "Extrusion2" cut sketch "Sketch2" against normal blind 7 contours A4 | A5
sketch "Sketch3" plane through (0, 0, 4) normal (0, 0, 1) x (1, 0, 0)
  circle A0 centre (27, 82.3047) radius 2 projected
  arc A1 (33, 95.5) -> (31, 97.5) centre (31, 95.5) ccw projected
  line L0 (31, 97.5) -> (22, 97.5) projected
  arc A2 (22, 97.5) -> (20, 95.5) centre (22, 95.5) ccw projected
  line L1 (20, 95.5) -> (20, 76.3047) projected
  line L2 (20, 76.3047) -> (33, 76.3047) projected
  line L3 (33, 76.3047) -> (33, 95.5) projected
  circle A3 centre (-26, 82.3047) radius 2 projected
  arc A4 (-20, 95.5) -> (-22, 97.5) centre (-22, 95.5) ccw projected
  line L4 (-22, 97.5) -> (-31, 97.5) projected
  arc A5 (-31, 97.5) -> (-33, 95.5) centre (-31, 95.5) ccw projected
  line L5 (-33, 95.5) -> (-33, 76.3047) projected
  line L6 (-33, 76.3047) -> (-20, 76.3047) projected
  line L7 (-20, 76.3047) -> (-20, 95.5) projected
  line L8 (20, 76.3047) -> (33, 76.3047) projected
  line L9 (-33, 76.3047) -> (-20, 76.3047) projected
  line L10 (-31, 76.3047) -> (-31, 95.5)
  line L11 (-31, 95.5) -> (-22, 95.5)
  line L12 (-22, 95.5) -> (-20, 95.5)
  line L13 (31, 76.3047) -> (31, 95.5)
  line L14 (31, 95.5) -> (22, 95.5)
  line L15 (22, 95.5) -> (20, 95.5)
  line L16 (-33, 95.5) -> (-33, 76.3047) projected
  line L17 (-31, 76.3047) -> (-33, 76.3047)
  line L18 (-33, 76.3047) -> (-33, 95.5)
  line L19 (-20, 76.3047) -> (-20, 95.5) projected
  line L20 (-20, 95.5) -> (-20, 76.3047)
  line L21 (-20, 76.3047) -> (-31, 76.3047)
  arc A6 (22, 97.5) -> (20, 95.5) centre (22, 95.5) ccw projected
  line L22 (20, 95.5) -> (20, 76.3047)
  line L23 (20, 76.3047) -> (31, 76.3047)
  point P0 (0, 0)
extrude "Extrusion3" add sketch "Sketch3" along normal blind 25 contours L3 L2 L13 L14 L15 A2 L0 A1 | L12 L11 L10 L6 L5 A5 L4 A4
fillet "Fillet1" radius 2 6 edges at (31, 95.5, 16.5) (-31, 95.5, 16.5) (-25.5, 95.5, 4) (-31, 85.9023, 4) (25.5, 95.5, 4) (31, 85.9023, 4)
sketch "Sketch4" plane through (0, 0, 29) normal (0, 0, 1) x (1, 0, 0)
  arc A0 (33, 95.5) -> (31, 97.5) centre (31, 95.5) ccw projected
  line L0 (31, 97.5) -> (22, 97.5) projected
  arc A1 (22, 97.5) -> (20, 95.5) centre (22, 95.5) ccw projected
  line L1 (20, 95.5) -> (29, 95.5) projected
  arc A2 (31, 93.5) -> (29, 95.5) centre (29, 93.5) ccw projected
  line L2 (31, 93.5) -> (31, 76.3047) projected
  line L3 (31, 76.3047) -> (33, 76.3047) projected
  line L4 (33, 76.3047) -> (33, 95.5) projected
  arc A3 (-20, 95.5) -> (-22, 97.5) centre (-22, 95.5) ccw projected
  line L5 (-22, 97.5) -> (-31, 97.5) projected
  arc A4 (-31, 97.5) -> (-33, 95.5) centre (-31, 95.5) ccw projected
  line L6 (-33, 95.5) -> (-33, 76.3047) projected
  line L7 (-33, 76.3047) -> (-31, 76.3047) projected
  line L8 (-31, 76.3047) -> (-31, 93.5) projected
  arc A5 (-29, 95.5) -> (-31, 93.5) centre (-29, 93.5) ccw projected
  line L9 (-29, 95.5) -> (-20, 95.5) projected
  line L10 (33, 76.3047) -> (-33, 76.3047)
  line L11 (-33, 76.3047) -> (-33, 126.3047)
  line L12 (-33, 126.3047) -> (33, 126.3047)
  line L13 (33, 126.3047) -> (33, 76.3047)
  point P0 (0, 0)
  dimension "d13" = 50
extrude "Extrusion4" add sketch "Sketch4" along normal blind 3
fillet "Fillet2" radius 2 6 edges at (26.5, 97.5, 29) (32.4142, 96.9142, 29) (20.5858, 96.9142, 29) (-32.4142, 96.9142, 29) (-20.5858, 96.9142, 29) (-26.5, 97.5, 29)
fillet "Fillet3" radius 5.5 4 edges at (-33, 126.3047, 30.5) (33, 126.3047, 30.5) (-33, 76.3047, 16) (33, 76.3047, 16)
equation "\"d4\" = d2"
equation "\"d5\" = d3"
equation "\"d7\" = d6"
properties part number "electronics support"
